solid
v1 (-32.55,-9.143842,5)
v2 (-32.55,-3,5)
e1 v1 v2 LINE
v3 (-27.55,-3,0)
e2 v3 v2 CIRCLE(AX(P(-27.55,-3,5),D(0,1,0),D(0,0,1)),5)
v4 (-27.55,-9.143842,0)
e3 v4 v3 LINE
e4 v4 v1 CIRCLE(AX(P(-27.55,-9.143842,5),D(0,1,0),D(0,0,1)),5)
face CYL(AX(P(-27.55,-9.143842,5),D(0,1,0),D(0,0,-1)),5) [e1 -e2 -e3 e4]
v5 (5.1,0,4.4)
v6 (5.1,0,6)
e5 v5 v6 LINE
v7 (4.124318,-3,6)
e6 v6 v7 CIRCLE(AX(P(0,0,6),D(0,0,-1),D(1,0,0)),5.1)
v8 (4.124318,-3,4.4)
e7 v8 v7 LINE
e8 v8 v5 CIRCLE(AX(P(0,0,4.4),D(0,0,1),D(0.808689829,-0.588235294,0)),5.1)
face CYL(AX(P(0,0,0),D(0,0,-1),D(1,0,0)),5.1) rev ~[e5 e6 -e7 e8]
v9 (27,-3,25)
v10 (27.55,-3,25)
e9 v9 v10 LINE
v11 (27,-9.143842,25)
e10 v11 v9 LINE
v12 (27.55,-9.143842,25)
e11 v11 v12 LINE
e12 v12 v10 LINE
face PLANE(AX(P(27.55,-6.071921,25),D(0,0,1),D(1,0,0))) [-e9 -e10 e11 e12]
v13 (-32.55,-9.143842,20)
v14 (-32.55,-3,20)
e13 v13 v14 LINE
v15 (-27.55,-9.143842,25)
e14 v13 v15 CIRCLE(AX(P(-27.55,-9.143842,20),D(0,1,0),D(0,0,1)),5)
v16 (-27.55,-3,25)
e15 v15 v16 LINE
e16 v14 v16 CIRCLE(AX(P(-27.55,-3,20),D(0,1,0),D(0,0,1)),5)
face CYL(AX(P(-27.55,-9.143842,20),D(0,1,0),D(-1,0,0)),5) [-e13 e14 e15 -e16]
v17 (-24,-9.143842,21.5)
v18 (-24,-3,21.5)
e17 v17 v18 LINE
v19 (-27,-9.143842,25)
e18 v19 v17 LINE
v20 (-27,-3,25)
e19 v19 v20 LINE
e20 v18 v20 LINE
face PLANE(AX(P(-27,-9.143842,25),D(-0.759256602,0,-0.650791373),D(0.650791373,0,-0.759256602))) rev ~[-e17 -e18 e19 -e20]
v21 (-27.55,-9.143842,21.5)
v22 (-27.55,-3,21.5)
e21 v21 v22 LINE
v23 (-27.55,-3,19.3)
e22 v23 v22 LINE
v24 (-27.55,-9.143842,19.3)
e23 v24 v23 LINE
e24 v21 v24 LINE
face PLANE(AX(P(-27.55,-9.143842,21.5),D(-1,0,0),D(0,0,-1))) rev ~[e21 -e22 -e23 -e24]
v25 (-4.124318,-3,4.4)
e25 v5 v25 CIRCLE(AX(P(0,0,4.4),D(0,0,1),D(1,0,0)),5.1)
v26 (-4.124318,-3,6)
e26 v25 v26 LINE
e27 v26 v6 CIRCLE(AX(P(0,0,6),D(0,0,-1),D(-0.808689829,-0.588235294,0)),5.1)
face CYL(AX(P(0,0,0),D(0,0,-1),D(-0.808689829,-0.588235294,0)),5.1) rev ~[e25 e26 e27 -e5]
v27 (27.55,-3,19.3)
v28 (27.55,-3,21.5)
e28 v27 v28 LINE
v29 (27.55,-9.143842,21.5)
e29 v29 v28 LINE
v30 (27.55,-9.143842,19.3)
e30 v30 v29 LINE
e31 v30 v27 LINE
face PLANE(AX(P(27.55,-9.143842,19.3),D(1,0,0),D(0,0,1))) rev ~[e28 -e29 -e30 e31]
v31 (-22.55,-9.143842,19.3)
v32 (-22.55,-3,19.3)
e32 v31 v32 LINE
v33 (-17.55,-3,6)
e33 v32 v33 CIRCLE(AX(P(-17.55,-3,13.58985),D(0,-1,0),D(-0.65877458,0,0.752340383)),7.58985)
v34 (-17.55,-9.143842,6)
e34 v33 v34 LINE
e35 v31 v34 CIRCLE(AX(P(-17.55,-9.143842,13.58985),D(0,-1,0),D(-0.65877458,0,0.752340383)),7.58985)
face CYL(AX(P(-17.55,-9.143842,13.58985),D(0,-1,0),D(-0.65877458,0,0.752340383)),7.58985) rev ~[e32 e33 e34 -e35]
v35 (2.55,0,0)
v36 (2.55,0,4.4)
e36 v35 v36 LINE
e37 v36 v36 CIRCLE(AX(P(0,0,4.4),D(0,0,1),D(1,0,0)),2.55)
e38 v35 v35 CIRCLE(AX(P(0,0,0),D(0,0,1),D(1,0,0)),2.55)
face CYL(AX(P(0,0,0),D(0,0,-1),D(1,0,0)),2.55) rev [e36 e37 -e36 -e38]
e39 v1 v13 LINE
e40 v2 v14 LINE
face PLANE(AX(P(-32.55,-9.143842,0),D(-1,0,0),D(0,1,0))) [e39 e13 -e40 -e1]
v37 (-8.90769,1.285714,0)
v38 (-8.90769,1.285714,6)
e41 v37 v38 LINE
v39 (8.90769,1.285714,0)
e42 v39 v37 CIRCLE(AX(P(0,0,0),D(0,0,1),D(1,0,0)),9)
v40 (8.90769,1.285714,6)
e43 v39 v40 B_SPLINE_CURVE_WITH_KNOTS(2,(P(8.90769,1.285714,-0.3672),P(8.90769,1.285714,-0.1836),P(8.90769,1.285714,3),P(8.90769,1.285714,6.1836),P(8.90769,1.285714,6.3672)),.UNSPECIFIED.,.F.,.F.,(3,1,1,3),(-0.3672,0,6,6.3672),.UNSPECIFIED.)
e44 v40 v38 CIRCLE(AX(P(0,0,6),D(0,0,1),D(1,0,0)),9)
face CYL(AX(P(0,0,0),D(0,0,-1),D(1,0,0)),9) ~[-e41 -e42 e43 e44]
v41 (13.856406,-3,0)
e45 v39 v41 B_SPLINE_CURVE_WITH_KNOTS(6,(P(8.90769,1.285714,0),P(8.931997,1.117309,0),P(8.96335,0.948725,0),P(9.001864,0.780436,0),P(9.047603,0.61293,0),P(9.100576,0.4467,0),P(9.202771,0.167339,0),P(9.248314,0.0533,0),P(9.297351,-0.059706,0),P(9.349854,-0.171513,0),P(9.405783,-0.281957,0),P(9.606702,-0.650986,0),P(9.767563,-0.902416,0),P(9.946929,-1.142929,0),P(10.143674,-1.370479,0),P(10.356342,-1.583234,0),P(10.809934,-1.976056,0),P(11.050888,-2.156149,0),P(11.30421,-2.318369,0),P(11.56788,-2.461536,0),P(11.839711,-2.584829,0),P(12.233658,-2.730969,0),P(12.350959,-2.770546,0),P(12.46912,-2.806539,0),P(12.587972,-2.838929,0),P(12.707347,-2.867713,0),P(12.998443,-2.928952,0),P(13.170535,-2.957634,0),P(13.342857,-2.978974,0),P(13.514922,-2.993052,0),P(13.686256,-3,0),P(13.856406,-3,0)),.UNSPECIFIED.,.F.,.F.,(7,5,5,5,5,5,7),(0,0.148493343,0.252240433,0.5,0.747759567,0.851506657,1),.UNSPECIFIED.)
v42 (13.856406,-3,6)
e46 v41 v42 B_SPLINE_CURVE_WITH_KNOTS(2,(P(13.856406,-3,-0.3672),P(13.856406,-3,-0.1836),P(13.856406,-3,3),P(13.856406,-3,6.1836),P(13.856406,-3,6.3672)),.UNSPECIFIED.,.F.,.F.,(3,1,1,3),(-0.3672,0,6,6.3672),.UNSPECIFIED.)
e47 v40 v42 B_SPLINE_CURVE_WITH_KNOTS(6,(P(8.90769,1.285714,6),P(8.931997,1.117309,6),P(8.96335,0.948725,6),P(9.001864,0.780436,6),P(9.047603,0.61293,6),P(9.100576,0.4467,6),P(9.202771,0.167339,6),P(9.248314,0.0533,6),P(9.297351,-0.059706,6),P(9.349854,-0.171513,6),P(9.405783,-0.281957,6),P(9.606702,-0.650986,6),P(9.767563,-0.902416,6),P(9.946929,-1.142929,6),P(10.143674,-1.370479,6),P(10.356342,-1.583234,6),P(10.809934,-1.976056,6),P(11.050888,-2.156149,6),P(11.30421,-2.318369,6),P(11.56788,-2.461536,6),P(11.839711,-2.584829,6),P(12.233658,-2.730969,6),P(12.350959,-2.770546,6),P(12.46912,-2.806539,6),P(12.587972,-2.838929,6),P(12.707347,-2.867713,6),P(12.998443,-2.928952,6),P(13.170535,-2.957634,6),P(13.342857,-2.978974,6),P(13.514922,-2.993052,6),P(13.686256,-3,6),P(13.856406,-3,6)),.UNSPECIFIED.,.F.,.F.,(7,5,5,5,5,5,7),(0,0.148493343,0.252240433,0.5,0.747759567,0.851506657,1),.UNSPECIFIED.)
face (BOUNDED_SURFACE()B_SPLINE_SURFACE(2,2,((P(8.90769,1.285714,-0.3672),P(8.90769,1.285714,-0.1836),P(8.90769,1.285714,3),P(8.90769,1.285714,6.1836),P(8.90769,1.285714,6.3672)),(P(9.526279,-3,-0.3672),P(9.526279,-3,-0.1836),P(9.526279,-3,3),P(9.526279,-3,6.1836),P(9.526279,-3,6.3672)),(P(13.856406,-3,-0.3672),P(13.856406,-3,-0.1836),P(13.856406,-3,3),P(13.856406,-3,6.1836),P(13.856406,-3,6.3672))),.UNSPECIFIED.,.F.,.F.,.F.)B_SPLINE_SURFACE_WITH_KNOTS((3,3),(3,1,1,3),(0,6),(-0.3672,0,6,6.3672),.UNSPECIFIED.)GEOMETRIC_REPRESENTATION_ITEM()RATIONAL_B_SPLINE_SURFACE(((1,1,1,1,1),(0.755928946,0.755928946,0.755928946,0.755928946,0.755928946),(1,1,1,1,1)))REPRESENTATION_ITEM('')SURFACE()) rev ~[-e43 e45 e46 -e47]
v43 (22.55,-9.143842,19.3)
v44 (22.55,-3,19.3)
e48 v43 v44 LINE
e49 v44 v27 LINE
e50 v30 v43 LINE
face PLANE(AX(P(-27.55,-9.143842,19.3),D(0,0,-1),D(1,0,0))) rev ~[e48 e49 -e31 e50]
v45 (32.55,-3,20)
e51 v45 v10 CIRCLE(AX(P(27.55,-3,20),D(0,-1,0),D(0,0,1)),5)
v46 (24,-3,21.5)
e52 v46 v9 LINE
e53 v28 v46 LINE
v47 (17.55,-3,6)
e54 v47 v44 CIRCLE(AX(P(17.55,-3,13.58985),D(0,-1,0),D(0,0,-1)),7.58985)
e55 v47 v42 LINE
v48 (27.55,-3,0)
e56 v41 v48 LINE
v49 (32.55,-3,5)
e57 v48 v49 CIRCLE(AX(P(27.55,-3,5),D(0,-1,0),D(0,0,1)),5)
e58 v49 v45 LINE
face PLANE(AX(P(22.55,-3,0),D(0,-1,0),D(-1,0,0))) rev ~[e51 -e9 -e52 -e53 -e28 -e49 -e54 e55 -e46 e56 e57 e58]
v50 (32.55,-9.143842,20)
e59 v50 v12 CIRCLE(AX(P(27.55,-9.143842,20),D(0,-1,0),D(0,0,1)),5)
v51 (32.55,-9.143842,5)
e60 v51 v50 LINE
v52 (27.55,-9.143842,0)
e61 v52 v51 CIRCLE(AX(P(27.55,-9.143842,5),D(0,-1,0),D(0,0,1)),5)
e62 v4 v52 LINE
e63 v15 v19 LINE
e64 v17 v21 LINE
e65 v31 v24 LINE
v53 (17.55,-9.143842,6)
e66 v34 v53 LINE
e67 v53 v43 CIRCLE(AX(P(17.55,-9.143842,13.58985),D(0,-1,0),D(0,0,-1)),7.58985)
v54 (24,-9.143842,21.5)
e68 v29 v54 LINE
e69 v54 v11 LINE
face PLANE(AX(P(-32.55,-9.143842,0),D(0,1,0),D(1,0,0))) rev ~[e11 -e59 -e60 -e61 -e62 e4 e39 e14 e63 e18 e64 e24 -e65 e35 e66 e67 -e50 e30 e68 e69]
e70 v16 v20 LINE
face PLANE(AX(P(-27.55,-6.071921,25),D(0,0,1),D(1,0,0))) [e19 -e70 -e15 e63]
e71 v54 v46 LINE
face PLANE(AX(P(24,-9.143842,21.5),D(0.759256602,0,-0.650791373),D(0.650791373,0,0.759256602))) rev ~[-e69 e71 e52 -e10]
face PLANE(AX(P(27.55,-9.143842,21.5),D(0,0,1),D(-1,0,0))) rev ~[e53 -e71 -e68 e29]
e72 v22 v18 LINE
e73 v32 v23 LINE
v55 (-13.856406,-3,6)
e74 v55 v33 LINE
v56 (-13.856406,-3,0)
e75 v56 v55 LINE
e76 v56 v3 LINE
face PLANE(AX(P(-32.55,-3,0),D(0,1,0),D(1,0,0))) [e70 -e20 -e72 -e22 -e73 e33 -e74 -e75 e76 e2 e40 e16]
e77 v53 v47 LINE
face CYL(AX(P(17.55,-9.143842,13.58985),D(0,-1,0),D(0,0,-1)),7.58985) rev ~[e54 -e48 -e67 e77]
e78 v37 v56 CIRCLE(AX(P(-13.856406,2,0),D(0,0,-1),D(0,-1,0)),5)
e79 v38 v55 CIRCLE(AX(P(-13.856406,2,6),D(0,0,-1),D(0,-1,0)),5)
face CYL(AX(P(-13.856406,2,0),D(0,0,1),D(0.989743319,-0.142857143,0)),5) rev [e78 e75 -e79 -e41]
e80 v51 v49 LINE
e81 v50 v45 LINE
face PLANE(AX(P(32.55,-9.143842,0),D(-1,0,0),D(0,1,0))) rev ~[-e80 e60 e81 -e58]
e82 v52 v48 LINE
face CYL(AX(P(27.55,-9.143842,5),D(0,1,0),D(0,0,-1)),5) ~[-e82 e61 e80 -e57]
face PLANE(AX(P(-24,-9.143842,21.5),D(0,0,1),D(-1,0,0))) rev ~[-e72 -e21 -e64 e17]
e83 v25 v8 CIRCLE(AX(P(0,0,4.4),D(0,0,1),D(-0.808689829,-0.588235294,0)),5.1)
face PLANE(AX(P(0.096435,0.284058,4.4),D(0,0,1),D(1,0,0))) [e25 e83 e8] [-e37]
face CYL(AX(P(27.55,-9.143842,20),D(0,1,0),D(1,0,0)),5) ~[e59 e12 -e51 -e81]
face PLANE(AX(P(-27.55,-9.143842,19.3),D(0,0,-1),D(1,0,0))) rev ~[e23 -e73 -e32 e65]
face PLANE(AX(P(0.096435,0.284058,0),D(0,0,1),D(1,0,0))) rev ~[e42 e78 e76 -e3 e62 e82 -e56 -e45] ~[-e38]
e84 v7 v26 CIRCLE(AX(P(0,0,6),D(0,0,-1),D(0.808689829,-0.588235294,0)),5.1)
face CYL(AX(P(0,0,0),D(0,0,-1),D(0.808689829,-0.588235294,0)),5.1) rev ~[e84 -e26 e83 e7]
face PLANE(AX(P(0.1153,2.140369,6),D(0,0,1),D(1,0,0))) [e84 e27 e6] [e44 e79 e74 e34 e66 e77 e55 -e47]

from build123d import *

# Parameters (mm, degrees)
F1_DEPTH = 6
F0_W     = 10
F0_H     = 6.1438416846
F2_DEPTH = 25
F3_DEPTH = 6
F0_R     = 2.55
F4_DEPTH = 4.4
F5_R     = 5
F7_DEPTH = 10


with BuildPart() as f1:
    # F0 (on Top) → F1 (new body)
    with BuildSketch(Plane.XY):
        with BuildLine():
            ThreePointArc((8.4852813742, -3), (0, -9), (-8.4852813742, -3))
            Line((-8.4852813742, -3), (-22.55, -3))
            Line((-22.55, -3), (-22.55, -9.1438416846))
            Line((-22.55, -9.1438416846), (22.55, -9.1438416846))
            Line((22.55, -9.1438416846), (22.55, -3))
            Line((22.55, -3), (8.4852813742, -3))
        make_face()
    extrude(amount=F1_DEPTH)

    # F0 (on Top) → F2 (join)
    with BuildSketch(Plane.XY):
        with Locations((-27.55, -6.0719208423)):
            Rectangle(F0_W, F0_H)
        with Locations((27.55, -6.0719208423)):
            Rectangle(F0_W, F0_H)
    extrude(amount=F2_DEPTH)

    # F0 (on Top) → F3 (join)
    with BuildSketch(Plane.XY):
        with BuildLine():
            ThreePointArc((-4.1243181255, -3), (-1.5773359756, 4.84994961), (5.1, 0))
            ThreePointArc((5.1, 0), (4.84994961, -1.5773359756), (4.1243181255, -3))
            Line((4.1243181255, -3), (8.4852813742, -3))
            ThreePointArc((8.4852813742, -3), (8.8703870369, -1.5219178085), (9, 0))
            ThreePointArc((9, 0), (-1.5219178085, 8.8703870369), (-8.4852813742, -3))
            Line((-8.4852813742, -3), (-4.1243181255, -3))
        make_face()
        with BuildLine():
            ThreePointArc((4.1243181255, -3), (0, -5.1), (-4.1243181255, -3))
            Line((-4.1243181255, -3), (-8.4852813742, -3))
            ThreePointArc((-8.4852813742, -3), (0, -9), (8.4852813742, -3))
            Line((8.4852813742, -3), (4.1243181255, -3))
        make_face()
    extrude(amount=F3_DEPTH)

    # F0 (on Top) → F4 (join)
    with BuildSketch(Plane.XY):
        with BuildLine():
            ThreePointArc((4.1243181255, -3), (4.84994961, -1.5773359756), (5.1, 0))
            ThreePointArc((5.1, 0), (-1.5773359756, 4.84994961), (-4.1243181255, -3))
            Line((-4.1243181255, -3), (4.1243181255, -3))
        make_face()
        Circle(F0_R, mode=Mode.SUBTRACT)
        with BuildLine():
            Line((4.1243181255, -3), (-4.1243181255, -3))
            ThreePointArc((-4.1243181255, -3), (0, -5.1), (4.1243181255, -3))
        make_face()
    extrude(amount=F4_DEPTH)

    # F5
    f5_edges = [f1.edges().sort_by_distance(p)[0] for p in [
        (-8.485281, -3, 3),
        (8.485281, -3, 3),
        (22.55, -6.071921, 6),
        (-22.55, -6.071921, 6),
        (-32.55, -6.071921, 0),
        (32.55, -6.071921, 0),
        (32.55, -6.071921, 25),
        (-32.55, -6.071921, 25),
    ]]
    fillet(f5_edges, radius=F5_R)

    # F6 (on face) → F7 (cut)
    with BuildSketch(Plane.XZ.offset(9.1438416846)):
        Polygon((17.55, 19.3), (22.55, 19.3), (22.55, 21.5), (-22.55, 21.5), (-22.55, 19.3), (-17.55, 19.3), align=None)
        Polygon((-22.55, 19.3), (-22.55, 21.5), (-24, 21.5), (-27.55, 21.5), (-27.55, 19.3), align=None)
        Polygon((22.55, 19.3), (27.55, 19.3), (27.55, 21.5), (24, 21.5), (22.55, 21.5), align=None)
        Polygon((-24, 21.5), (-22.55, 21.5), (-22.55, 25), (-27, 25), align=None)
        Polygon((22.55, 25), (22.55, 21.5), (24, 21.5), (27, 25), align=None)
        with BuildLine():
            ThreePointArc((-22.55, 19.3), (-24.654400045, 10.9190225395), (-17.55, 6))
            ThreePointArc((-17.55, 6), (-21.0855339059, 7.4644660941), (-22.55, 11))
            Line((-22.55, 11), (-22.55, 19.3))
        make_face()
        with BuildLine():
            ThreePointArc((17.55, 6), (24.654400045, 10.9190225395), (22.55, 19.3))
            Line((22.55, 19.3), (22.55, 11))
            ThreePointArc((22.55, 11), (21.0855339059, 7.4644660941), (17.55, 6))
        make_face()
    extrude(amount=-F7_DEPTH, mode=Mode.SUBTRACT)


solid = f1.part
